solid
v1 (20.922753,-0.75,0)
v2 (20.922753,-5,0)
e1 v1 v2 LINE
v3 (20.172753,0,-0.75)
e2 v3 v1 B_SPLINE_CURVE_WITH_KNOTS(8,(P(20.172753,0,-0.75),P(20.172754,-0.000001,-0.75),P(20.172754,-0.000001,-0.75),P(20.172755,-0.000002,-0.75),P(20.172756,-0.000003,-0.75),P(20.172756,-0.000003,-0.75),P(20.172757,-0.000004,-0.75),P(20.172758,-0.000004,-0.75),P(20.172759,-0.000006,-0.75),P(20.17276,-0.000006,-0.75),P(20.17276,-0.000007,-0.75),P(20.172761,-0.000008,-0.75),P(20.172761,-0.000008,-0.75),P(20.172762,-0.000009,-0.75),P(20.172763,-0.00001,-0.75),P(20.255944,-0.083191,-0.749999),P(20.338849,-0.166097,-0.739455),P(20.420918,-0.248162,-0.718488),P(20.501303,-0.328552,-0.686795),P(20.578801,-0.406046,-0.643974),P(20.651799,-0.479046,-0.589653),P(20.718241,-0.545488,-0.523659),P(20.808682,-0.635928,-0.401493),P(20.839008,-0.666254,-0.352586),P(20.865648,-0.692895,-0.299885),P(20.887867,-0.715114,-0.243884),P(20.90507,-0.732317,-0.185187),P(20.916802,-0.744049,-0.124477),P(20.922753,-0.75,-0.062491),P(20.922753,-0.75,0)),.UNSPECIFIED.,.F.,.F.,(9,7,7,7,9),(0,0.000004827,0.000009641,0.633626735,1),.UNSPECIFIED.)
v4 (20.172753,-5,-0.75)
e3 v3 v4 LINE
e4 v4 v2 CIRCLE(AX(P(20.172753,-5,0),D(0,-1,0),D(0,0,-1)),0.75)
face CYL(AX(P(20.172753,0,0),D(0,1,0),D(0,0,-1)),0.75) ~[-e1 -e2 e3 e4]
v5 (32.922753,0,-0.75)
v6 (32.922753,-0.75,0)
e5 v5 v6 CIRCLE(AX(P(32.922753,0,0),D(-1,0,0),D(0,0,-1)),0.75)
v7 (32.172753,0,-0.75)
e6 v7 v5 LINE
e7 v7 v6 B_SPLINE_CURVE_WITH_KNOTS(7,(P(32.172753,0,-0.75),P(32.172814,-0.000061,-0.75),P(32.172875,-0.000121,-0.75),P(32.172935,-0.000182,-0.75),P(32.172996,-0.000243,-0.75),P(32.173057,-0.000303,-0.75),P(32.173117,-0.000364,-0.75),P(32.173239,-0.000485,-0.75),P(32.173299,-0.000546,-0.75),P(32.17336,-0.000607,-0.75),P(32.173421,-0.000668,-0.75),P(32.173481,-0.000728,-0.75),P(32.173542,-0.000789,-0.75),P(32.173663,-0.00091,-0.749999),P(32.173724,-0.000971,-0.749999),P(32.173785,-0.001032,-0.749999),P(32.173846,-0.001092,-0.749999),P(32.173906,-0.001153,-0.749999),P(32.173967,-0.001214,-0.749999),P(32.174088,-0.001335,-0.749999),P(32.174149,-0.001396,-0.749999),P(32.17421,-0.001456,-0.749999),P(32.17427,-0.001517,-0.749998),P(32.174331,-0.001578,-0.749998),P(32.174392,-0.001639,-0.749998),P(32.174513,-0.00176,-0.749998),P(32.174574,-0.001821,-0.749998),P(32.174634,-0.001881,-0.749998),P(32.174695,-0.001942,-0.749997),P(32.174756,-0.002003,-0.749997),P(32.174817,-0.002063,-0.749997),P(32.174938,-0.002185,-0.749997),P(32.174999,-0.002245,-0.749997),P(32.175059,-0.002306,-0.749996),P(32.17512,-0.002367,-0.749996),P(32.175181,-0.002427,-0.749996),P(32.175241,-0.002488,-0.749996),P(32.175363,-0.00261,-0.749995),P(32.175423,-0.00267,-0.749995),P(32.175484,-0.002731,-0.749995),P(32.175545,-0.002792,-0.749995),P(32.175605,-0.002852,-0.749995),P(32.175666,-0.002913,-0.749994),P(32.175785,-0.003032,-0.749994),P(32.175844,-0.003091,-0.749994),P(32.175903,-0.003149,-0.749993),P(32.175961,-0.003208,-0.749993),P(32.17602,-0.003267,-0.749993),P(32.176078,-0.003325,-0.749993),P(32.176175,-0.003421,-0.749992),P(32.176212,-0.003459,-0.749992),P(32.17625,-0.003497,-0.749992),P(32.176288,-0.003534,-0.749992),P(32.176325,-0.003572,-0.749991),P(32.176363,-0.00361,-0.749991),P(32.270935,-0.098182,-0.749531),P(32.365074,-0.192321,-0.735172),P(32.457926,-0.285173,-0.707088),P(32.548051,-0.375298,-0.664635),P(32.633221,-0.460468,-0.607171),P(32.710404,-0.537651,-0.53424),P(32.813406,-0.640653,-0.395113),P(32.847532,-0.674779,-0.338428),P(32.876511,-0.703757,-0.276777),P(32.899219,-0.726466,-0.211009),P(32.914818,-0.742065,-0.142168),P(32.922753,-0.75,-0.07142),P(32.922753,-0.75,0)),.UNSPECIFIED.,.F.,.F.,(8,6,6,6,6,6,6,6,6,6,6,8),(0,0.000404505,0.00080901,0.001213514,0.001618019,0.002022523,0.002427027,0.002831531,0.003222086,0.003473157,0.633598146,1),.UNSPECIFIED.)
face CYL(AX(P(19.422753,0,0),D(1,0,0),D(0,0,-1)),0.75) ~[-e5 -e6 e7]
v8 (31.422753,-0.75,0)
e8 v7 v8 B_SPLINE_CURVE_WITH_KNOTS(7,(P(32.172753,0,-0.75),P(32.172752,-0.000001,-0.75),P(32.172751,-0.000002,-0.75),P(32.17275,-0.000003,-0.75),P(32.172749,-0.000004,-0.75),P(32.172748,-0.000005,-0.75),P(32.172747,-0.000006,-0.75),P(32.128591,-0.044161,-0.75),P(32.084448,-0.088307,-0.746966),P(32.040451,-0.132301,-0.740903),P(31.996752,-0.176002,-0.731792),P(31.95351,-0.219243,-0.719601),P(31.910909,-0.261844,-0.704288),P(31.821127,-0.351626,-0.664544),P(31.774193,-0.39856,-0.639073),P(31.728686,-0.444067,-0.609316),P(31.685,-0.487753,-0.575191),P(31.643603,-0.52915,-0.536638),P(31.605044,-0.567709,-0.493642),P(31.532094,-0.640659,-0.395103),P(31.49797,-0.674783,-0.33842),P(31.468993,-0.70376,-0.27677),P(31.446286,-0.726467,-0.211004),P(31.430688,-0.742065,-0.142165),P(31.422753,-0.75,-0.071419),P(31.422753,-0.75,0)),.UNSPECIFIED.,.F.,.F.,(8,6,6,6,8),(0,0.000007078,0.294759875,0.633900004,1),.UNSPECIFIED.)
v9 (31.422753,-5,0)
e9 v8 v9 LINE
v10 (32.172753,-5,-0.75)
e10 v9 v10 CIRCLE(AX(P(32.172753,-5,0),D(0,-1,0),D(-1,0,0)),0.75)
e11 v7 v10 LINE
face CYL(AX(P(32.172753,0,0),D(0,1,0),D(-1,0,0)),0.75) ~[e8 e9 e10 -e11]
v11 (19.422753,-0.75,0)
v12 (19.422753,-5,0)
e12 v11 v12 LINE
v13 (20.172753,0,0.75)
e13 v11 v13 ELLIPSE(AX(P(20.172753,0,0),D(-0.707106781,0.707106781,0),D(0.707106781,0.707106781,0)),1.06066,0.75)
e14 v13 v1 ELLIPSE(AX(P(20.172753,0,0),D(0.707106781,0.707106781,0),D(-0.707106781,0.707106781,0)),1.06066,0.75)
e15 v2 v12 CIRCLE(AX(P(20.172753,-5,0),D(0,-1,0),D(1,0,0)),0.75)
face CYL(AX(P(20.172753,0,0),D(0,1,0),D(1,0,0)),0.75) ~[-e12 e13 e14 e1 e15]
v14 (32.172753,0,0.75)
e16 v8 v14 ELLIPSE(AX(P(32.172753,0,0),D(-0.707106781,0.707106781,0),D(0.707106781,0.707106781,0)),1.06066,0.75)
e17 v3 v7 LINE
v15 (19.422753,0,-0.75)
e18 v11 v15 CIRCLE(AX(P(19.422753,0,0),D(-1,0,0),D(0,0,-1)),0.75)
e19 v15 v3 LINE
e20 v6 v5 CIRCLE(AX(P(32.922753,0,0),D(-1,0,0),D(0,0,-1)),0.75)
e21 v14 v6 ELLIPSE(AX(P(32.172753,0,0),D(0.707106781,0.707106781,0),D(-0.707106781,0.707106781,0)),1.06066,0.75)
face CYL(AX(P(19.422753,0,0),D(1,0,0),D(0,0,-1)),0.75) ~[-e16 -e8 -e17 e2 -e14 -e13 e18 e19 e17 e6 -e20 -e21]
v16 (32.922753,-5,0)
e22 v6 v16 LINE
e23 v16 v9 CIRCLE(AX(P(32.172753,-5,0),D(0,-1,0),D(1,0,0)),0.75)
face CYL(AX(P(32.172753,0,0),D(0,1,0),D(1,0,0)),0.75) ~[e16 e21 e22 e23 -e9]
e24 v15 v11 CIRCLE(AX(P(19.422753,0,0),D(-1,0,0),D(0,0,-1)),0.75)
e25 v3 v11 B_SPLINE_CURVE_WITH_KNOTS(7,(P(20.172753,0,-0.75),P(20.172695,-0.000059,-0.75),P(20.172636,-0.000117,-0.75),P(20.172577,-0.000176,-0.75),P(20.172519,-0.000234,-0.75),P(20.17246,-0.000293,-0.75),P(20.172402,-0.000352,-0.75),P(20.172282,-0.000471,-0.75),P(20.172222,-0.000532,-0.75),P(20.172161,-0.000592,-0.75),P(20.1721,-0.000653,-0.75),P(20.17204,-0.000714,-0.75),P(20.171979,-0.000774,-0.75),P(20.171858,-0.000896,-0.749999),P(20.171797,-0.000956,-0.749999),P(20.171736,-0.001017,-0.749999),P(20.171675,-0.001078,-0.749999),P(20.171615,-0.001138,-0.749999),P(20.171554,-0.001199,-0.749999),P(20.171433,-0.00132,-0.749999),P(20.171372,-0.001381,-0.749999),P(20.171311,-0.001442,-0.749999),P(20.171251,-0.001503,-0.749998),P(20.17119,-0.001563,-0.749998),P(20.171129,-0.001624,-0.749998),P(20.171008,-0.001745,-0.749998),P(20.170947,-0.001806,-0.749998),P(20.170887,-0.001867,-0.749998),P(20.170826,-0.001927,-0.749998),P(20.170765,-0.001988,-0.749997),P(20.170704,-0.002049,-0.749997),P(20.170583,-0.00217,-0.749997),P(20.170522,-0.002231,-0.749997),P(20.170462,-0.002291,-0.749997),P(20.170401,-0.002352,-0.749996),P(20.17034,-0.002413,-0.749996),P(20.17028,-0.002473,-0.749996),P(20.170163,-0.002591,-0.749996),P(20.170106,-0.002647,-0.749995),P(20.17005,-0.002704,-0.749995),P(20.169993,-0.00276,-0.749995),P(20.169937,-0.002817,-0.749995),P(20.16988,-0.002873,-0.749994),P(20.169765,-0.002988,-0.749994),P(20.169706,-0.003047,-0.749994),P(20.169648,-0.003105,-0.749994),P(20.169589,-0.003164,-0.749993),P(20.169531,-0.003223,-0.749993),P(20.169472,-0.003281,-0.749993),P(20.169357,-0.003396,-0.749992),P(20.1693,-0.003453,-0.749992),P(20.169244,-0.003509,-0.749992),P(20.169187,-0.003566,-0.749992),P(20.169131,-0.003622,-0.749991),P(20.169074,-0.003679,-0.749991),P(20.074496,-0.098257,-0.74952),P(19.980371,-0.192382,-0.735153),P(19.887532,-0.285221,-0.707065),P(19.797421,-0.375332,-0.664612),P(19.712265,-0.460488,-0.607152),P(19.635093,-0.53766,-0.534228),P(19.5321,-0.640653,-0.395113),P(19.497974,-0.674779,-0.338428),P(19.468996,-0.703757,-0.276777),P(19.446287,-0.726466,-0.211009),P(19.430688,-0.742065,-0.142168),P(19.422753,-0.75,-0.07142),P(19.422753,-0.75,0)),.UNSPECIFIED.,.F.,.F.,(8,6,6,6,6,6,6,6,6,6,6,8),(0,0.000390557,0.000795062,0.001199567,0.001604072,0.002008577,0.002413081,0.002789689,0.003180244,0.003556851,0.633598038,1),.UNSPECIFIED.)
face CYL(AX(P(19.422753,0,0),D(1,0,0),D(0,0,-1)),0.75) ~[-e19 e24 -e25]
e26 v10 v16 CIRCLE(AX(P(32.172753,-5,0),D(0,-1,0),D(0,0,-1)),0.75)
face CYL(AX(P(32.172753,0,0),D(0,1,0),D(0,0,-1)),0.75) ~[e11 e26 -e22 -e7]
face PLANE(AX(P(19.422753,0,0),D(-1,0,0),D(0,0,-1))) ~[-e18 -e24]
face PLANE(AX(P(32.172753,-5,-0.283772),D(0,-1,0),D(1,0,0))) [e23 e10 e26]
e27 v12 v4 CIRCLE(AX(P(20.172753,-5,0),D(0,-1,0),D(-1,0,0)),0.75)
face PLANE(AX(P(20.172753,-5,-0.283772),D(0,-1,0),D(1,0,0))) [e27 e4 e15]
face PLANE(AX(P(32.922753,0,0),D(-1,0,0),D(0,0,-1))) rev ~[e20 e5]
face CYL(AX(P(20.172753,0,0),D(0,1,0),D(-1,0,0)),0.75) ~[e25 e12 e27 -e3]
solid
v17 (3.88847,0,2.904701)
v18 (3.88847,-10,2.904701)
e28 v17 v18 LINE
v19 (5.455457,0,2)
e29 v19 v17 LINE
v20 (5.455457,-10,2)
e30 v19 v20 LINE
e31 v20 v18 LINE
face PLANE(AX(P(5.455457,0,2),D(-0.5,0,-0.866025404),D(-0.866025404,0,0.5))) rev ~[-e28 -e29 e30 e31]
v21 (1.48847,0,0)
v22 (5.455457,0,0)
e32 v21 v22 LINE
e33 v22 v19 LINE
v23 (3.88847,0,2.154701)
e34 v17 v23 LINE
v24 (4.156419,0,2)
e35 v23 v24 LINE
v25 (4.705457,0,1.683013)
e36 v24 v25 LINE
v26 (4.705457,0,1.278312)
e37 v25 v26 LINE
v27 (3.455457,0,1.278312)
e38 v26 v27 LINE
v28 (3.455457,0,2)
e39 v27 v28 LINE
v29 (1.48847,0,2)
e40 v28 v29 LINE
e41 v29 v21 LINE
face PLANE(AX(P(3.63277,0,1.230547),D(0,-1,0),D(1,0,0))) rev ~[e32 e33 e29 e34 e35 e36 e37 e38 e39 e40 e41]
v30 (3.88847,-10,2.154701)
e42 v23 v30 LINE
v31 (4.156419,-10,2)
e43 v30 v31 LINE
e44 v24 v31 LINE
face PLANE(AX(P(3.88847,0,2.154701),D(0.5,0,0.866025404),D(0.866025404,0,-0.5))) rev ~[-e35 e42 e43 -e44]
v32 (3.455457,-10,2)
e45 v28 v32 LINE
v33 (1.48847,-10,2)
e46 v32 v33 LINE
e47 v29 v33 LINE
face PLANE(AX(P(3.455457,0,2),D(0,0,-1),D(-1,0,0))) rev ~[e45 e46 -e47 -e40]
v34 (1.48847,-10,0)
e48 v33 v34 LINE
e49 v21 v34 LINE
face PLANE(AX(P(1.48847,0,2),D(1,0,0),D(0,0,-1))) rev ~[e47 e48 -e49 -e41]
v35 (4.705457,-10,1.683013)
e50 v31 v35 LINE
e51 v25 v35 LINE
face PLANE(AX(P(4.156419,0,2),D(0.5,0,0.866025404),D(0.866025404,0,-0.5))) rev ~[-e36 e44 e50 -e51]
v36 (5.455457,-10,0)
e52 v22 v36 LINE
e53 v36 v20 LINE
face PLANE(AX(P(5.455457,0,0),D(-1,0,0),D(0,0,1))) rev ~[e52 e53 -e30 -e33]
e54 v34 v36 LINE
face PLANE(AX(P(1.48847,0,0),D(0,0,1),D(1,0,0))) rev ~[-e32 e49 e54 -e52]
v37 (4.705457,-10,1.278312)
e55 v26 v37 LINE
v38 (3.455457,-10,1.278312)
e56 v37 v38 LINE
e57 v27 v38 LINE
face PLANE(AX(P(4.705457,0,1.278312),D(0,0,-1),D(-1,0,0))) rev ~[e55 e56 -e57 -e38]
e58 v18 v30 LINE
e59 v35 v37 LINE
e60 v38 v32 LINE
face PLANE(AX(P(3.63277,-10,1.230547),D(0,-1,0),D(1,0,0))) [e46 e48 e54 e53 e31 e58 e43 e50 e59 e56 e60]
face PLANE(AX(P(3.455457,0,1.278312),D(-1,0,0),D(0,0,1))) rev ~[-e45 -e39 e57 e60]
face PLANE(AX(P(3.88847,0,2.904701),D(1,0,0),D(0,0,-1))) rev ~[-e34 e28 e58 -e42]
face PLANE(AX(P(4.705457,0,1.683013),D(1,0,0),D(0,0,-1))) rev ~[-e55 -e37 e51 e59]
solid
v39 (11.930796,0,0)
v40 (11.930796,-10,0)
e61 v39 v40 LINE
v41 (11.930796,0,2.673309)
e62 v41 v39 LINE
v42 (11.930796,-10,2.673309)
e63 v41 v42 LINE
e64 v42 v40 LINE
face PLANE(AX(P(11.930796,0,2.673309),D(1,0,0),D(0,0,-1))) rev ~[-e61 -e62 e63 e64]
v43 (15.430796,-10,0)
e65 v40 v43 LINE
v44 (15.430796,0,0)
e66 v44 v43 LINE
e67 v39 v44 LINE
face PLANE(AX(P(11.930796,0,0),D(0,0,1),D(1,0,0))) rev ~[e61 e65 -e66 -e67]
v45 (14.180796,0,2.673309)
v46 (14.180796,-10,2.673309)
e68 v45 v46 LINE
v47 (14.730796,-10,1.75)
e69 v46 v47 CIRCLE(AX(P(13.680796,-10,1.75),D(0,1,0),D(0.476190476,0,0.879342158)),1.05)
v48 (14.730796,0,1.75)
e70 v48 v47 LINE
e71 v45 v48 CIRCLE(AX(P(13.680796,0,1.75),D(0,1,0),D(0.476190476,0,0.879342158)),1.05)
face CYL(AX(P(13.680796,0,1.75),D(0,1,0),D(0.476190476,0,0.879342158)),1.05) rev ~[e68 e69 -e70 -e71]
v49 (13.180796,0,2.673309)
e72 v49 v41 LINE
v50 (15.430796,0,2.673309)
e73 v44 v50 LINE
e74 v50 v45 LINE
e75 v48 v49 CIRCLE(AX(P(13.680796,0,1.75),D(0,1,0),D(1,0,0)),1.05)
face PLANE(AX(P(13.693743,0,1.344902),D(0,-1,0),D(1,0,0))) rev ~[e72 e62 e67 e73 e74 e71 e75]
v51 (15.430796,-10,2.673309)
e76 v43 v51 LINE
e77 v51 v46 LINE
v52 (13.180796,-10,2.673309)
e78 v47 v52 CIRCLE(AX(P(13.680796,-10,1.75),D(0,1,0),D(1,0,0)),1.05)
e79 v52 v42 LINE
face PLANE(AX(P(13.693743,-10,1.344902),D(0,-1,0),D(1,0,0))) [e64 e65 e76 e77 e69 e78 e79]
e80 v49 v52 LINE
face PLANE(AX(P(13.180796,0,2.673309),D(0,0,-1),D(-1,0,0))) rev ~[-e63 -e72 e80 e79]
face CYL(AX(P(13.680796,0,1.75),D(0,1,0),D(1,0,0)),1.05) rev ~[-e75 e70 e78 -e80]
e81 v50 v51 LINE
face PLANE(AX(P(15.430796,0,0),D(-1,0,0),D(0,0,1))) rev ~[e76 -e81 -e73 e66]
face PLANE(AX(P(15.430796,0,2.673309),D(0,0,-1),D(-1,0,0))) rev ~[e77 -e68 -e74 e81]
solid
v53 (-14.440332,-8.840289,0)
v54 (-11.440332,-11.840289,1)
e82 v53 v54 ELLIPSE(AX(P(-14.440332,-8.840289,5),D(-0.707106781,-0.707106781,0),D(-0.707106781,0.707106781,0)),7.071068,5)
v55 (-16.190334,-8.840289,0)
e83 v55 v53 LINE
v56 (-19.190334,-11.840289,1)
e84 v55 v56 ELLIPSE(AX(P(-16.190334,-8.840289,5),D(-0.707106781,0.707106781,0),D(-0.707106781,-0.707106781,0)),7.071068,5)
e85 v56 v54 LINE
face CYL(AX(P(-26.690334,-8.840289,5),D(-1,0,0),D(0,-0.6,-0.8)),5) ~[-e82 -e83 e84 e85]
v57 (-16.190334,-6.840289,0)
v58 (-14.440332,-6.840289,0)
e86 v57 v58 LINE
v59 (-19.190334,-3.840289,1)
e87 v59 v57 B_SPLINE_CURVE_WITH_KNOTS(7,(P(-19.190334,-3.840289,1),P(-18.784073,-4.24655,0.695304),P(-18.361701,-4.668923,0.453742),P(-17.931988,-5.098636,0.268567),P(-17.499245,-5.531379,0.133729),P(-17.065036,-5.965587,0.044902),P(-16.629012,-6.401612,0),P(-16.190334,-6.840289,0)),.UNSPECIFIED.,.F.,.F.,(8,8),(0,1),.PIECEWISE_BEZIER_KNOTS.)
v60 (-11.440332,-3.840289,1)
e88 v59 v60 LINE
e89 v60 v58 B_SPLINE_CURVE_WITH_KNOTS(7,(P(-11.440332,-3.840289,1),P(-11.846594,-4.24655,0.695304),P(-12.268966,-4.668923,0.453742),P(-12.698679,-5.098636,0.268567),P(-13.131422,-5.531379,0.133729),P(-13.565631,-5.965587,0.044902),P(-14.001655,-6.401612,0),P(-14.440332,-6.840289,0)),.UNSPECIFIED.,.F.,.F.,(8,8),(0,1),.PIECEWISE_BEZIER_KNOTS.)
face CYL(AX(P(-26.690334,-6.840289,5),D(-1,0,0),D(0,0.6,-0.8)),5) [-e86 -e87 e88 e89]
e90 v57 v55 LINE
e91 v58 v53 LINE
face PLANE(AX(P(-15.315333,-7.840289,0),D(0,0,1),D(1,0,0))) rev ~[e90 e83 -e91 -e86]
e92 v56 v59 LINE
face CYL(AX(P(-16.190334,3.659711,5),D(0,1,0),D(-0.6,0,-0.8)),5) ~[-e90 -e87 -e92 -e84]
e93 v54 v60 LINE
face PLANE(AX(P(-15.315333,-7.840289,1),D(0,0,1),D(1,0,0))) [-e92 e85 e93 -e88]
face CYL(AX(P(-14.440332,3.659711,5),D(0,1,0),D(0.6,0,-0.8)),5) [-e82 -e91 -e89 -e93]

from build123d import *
from build123d import SkipClean  # not in build123d's __all__

# Parameters (mm, degrees)
F1_DEPTH    = 10
F2_W        = 7.7500019912
F2_H        = 8
F3_DEPTH    = 1
F4_T1_DEPTH = 22.7500019912
F4_T3_DEPTH = 23
F6_DEPTH    = 10
F8_DEPTH    = 5


# Not quite as in the source:
# - a fillet or chamfer that OpenCascade refuses, or shapes differently, is made with other operations: its cross-section is extruded or revolved along the edge and cut away or added


with BuildPart() as f1:
    # F0 (on Front) → F1 (new body)
    with BuildSketch(Plane.XZ):
        Polygon((3.4554570526, 2), (1.4884697545, 2), (1.4884697545, 0), (5.4554570526, 0), (5.4554570526, 2), (3.8884697545, 2.9047005384), (3.8884697545, 2.1547005384), (4.1564189469, 2), (4.7054570526, 1.6830127019), (4.7054570526, 1.2783121635), (3.8884697545, 1.2783121635), (3.4554570526, 1.2783121635), align=None)
    extrude(amount=F1_DEPTH)


with BuildPart() as f3:
    # F2 (on Top) → F3 (new body)
    with BuildSketch(Plane.XY):
        with Locations((-15.3153333813, -7.8402892686)):
            Rectangle(F2_W, F2_H)
    extrude(amount=F3_DEPTH)

    # F4: fillet of radius 5 on 4 edges, made by hand

    # F4_s2 → F4_t1 (cut)
    with BuildSketch(Plane.YZ.offset(-26.6903343769)):
        with BuildLine():
            ThreePointArc((-3.8402892686, 1), (-5.2591504386, 0.2565835097), (-6.8402892686, 0))
            Line((-6.8402892686, 0), (-6.8402892686, -0.1))
            Line((-6.8402892686, -0.1), (-3.8402892686, -0.1))
            Line((-3.8402892686, -0.1), (-3.7402892686, 0))
            ThreePointArc((-3.7402892686, 0), (-3.7402892686, 0.5), (-3.7802892686, 0.92))
            Line((-3.7802892686, 0.92), (-3.8402892686, 1))
        make_face()
        with BuildLine():
            ThreePointArc((-11.8402892686, 1), (-10.4214280987, 0.2565835097), (-8.8402892686, 0))
            Line((-8.8402892686, 0), (-8.8402892686, -0.1))
            Line((-8.8402892686, -0.1), (-11.8402892686, -0.1))
            Line((-11.8402892686, -0.1), (-11.9402892686, 0))
            ThreePointArc((-11.9402892686, 0), (-11.9402892686, 0.5), (-11.9002892686, 0.92))
            Line((-11.9002892686, 0.92), (-11.8402892686, 1))
        make_face()
    extrude(amount=F4_T1_DEPTH, mode=Mode.SUBTRACT)

    # F4_s4 → F4_t3 (cut)
    with BuildSketch(Plane.XZ.offset(-3.6597107314)):
        with BuildLine():
            ThreePointArc((-19.1903343769, 1), (-17.771473207, 0.2565835097), (-16.1903343769, 0))
            Line((-16.1903343769, 0), (-16.1903343769, -0.1))
            Line((-16.1903343769, -0.1), (-19.1903343769, -0.1))
            Line((-19.1903343769, -0.1), (-19.2903343769, 0))
            ThreePointArc((-19.2903343769, 0), (-19.2903343769, 0.5), (-19.2503343769, 0.92))
            Line((-19.2503343769, 0.92), (-19.1903343769, 1))
        make_face()
        with BuildLine():
            ThreePointArc((-11.4403323857, 1), (-12.8591935556, 0.2565835097), (-14.4403323857, 0))
            Line((-14.4403323857, 0), (-14.4403323857, -0.1))
            Line((-14.4403323857, -0.1), (-11.4403323857, -0.1))
            Line((-11.4403323857, -0.1), (-11.3403323857, 0))
            ThreePointArc((-11.3403323857, 0), (-11.3403323857, 0.5), (-11.3803323857, 0.92))
            Line((-11.3803323857, 0.92), (-11.4403323857, 1))
        make_face()
    extrude(amount=F4_T3_DEPTH, mode=Mode.SUBTRACT)


with BuildPart() as f6:
    # F5 (on Front) → F6 (new body)
    with BuildSketch(Plane.XZ):
        with BuildLine():
            Line((13.1807962247, 2.6733092656), (11.9307962247, 2.6733092656))
            Line((11.9307962247, 2.6733092656), (11.9307962247, 0))
            Line((11.9307962247, 0), (15.4307962247, 0))
            Line((15.4307962247, 0), (15.4307962247, 2.6733092656))
            Line((15.4307962247, 2.6733092656), (14.1807962247, 2.6733092656))
            ThreePointArc((14.1807962247, 2.6733092656), (14.5828771524, 2.2873546315), (14.7307962247, 1.75))
            ThreePointArc((14.7307962247, 1.75), (13.1434415932, 0.8479190724), (13.1807962247, 2.6733092656))
        make_face()
    extrude(amount=F6_DEPTH)


with BuildPart() as f8:
    # F7 (on Front) → F8 (new body)
    with BuildSketch(Plane.XZ):
        with BuildLine():
            ThreePointArc((20.1727531818, -0.75), (20.7030832677, -0.5303300859), (20.9227531818, 0))
            Line((20.9227531818, 0), (19.4227531818, 0))
            ThreePointArc((19.4227531818, 0), (19.6424230959, -0.5303300859), (20.1727531818, -0.75))
        make_face()
        with BuildLine():
            Line((19.4227531818, 0), (20.9227531818, 0))
            ThreePointArc((20.9227531818, 0), (20.1727531818, 0.75), (19.4227531818, 0))
        make_face()
    extrude(amount=F8_DEPTH)



with BuildPart() as f8b:
    # F7 (on Front) → F8, piece 2 (new body)
    with BuildSketch(Plane.XZ):
        with BuildLine():
            ThreePointArc((32.1727531818, -0.75), (32.7030832677, -0.5303300859), (32.9227531818, 0))
            Line((32.9227531818, 0), (31.4227531818, 0))
            ThreePointArc((31.4227531818, 0), (31.6424230959, -0.5303300859), (32.1727531818, -0.75))
        make_face()
        with BuildLine():
            Line((31.4227531818, 0), (32.9227531818, 0))
            ThreePointArc((32.9227531818, 0), (32.1727531818, 0.75), (31.4227531818, 0))
        make_face()
    extrude(amount=F8_DEPTH)


with BuildPart() as f8_1:
    add(f8.part, clean=False)

    with SkipClean():  # cleaning this boolean's faces spoils the solid; the shape is the same uncleaned
        add(f8b.part)  # F9 merges F8b
    # F7 (on Front) → F9 (revolve)
    with BuildSketch(Plane.XZ):
        with BuildLine():
            Line((32.9227531818, -0.75), (32.9227531818, 0))
            ThreePointArc((32.9227531818, 0), (32.7030832677, -0.5303300859), (32.1727531818, -0.75))
            Line((32.1727531818, -0.75), (32.9227531818, -0.75))
        make_face()
        with BuildLine():
            ThreePointArc((32.1727531818, -0.75), (32.7030832677, -0.5303300859), (32.9227531818, 0))
            Line((32.9227531818, 0), (31.4227531818, 0))
            ThreePointArc((31.4227531818, 0), (31.6424230959, -0.5303300859), (32.1727531818, -0.75))
        make_face()
        with BuildLine():
            ThreePointArc((32.1727531818, -0.75), (31.6424230959, -0.5303300859), (31.4227531818, 0))
            Line((31.4227531818, 0), (20.9227531818, 0))
            ThreePointArc((20.9227531818, 0), (20.7030832677, -0.5303300859), (20.1727531818, -0.75))
            Line((20.1727531818, -0.75), (32.1727531818, -0.75))
        make_face()
        with BuildLine():
            ThreePointArc((20.1727531818, -0.75), (20.7030832677, -0.5303300859), (20.9227531818, 0))
            Line((20.9227531818, 0), (19.4227531818, 0))
            ThreePointArc((19.4227531818, 0), (19.6424230959, -0.5303300859), (20.1727531818, -0.75))
        make_face()
        with BuildLine():
            Line((19.4227531818, -0.75), (20.1727531818, -0.75))
            ThreePointArc((20.1727531818, -0.75), (19.6424230959, -0.5303300859), (19.4227531818, 0))
            Line((19.4227531818, 0), (19.4227531818, -0.75))
        make_face()
    with SkipClean():  # cleaning this boolean's faces spoils the solid; the shape is the same uncleaned
        revolve(axis=Axis((26.1727531818, 0, 0), (-1, 0, 0)))


solid = Compound([f1.part, f3.part, f6.part, f8_1.part])
